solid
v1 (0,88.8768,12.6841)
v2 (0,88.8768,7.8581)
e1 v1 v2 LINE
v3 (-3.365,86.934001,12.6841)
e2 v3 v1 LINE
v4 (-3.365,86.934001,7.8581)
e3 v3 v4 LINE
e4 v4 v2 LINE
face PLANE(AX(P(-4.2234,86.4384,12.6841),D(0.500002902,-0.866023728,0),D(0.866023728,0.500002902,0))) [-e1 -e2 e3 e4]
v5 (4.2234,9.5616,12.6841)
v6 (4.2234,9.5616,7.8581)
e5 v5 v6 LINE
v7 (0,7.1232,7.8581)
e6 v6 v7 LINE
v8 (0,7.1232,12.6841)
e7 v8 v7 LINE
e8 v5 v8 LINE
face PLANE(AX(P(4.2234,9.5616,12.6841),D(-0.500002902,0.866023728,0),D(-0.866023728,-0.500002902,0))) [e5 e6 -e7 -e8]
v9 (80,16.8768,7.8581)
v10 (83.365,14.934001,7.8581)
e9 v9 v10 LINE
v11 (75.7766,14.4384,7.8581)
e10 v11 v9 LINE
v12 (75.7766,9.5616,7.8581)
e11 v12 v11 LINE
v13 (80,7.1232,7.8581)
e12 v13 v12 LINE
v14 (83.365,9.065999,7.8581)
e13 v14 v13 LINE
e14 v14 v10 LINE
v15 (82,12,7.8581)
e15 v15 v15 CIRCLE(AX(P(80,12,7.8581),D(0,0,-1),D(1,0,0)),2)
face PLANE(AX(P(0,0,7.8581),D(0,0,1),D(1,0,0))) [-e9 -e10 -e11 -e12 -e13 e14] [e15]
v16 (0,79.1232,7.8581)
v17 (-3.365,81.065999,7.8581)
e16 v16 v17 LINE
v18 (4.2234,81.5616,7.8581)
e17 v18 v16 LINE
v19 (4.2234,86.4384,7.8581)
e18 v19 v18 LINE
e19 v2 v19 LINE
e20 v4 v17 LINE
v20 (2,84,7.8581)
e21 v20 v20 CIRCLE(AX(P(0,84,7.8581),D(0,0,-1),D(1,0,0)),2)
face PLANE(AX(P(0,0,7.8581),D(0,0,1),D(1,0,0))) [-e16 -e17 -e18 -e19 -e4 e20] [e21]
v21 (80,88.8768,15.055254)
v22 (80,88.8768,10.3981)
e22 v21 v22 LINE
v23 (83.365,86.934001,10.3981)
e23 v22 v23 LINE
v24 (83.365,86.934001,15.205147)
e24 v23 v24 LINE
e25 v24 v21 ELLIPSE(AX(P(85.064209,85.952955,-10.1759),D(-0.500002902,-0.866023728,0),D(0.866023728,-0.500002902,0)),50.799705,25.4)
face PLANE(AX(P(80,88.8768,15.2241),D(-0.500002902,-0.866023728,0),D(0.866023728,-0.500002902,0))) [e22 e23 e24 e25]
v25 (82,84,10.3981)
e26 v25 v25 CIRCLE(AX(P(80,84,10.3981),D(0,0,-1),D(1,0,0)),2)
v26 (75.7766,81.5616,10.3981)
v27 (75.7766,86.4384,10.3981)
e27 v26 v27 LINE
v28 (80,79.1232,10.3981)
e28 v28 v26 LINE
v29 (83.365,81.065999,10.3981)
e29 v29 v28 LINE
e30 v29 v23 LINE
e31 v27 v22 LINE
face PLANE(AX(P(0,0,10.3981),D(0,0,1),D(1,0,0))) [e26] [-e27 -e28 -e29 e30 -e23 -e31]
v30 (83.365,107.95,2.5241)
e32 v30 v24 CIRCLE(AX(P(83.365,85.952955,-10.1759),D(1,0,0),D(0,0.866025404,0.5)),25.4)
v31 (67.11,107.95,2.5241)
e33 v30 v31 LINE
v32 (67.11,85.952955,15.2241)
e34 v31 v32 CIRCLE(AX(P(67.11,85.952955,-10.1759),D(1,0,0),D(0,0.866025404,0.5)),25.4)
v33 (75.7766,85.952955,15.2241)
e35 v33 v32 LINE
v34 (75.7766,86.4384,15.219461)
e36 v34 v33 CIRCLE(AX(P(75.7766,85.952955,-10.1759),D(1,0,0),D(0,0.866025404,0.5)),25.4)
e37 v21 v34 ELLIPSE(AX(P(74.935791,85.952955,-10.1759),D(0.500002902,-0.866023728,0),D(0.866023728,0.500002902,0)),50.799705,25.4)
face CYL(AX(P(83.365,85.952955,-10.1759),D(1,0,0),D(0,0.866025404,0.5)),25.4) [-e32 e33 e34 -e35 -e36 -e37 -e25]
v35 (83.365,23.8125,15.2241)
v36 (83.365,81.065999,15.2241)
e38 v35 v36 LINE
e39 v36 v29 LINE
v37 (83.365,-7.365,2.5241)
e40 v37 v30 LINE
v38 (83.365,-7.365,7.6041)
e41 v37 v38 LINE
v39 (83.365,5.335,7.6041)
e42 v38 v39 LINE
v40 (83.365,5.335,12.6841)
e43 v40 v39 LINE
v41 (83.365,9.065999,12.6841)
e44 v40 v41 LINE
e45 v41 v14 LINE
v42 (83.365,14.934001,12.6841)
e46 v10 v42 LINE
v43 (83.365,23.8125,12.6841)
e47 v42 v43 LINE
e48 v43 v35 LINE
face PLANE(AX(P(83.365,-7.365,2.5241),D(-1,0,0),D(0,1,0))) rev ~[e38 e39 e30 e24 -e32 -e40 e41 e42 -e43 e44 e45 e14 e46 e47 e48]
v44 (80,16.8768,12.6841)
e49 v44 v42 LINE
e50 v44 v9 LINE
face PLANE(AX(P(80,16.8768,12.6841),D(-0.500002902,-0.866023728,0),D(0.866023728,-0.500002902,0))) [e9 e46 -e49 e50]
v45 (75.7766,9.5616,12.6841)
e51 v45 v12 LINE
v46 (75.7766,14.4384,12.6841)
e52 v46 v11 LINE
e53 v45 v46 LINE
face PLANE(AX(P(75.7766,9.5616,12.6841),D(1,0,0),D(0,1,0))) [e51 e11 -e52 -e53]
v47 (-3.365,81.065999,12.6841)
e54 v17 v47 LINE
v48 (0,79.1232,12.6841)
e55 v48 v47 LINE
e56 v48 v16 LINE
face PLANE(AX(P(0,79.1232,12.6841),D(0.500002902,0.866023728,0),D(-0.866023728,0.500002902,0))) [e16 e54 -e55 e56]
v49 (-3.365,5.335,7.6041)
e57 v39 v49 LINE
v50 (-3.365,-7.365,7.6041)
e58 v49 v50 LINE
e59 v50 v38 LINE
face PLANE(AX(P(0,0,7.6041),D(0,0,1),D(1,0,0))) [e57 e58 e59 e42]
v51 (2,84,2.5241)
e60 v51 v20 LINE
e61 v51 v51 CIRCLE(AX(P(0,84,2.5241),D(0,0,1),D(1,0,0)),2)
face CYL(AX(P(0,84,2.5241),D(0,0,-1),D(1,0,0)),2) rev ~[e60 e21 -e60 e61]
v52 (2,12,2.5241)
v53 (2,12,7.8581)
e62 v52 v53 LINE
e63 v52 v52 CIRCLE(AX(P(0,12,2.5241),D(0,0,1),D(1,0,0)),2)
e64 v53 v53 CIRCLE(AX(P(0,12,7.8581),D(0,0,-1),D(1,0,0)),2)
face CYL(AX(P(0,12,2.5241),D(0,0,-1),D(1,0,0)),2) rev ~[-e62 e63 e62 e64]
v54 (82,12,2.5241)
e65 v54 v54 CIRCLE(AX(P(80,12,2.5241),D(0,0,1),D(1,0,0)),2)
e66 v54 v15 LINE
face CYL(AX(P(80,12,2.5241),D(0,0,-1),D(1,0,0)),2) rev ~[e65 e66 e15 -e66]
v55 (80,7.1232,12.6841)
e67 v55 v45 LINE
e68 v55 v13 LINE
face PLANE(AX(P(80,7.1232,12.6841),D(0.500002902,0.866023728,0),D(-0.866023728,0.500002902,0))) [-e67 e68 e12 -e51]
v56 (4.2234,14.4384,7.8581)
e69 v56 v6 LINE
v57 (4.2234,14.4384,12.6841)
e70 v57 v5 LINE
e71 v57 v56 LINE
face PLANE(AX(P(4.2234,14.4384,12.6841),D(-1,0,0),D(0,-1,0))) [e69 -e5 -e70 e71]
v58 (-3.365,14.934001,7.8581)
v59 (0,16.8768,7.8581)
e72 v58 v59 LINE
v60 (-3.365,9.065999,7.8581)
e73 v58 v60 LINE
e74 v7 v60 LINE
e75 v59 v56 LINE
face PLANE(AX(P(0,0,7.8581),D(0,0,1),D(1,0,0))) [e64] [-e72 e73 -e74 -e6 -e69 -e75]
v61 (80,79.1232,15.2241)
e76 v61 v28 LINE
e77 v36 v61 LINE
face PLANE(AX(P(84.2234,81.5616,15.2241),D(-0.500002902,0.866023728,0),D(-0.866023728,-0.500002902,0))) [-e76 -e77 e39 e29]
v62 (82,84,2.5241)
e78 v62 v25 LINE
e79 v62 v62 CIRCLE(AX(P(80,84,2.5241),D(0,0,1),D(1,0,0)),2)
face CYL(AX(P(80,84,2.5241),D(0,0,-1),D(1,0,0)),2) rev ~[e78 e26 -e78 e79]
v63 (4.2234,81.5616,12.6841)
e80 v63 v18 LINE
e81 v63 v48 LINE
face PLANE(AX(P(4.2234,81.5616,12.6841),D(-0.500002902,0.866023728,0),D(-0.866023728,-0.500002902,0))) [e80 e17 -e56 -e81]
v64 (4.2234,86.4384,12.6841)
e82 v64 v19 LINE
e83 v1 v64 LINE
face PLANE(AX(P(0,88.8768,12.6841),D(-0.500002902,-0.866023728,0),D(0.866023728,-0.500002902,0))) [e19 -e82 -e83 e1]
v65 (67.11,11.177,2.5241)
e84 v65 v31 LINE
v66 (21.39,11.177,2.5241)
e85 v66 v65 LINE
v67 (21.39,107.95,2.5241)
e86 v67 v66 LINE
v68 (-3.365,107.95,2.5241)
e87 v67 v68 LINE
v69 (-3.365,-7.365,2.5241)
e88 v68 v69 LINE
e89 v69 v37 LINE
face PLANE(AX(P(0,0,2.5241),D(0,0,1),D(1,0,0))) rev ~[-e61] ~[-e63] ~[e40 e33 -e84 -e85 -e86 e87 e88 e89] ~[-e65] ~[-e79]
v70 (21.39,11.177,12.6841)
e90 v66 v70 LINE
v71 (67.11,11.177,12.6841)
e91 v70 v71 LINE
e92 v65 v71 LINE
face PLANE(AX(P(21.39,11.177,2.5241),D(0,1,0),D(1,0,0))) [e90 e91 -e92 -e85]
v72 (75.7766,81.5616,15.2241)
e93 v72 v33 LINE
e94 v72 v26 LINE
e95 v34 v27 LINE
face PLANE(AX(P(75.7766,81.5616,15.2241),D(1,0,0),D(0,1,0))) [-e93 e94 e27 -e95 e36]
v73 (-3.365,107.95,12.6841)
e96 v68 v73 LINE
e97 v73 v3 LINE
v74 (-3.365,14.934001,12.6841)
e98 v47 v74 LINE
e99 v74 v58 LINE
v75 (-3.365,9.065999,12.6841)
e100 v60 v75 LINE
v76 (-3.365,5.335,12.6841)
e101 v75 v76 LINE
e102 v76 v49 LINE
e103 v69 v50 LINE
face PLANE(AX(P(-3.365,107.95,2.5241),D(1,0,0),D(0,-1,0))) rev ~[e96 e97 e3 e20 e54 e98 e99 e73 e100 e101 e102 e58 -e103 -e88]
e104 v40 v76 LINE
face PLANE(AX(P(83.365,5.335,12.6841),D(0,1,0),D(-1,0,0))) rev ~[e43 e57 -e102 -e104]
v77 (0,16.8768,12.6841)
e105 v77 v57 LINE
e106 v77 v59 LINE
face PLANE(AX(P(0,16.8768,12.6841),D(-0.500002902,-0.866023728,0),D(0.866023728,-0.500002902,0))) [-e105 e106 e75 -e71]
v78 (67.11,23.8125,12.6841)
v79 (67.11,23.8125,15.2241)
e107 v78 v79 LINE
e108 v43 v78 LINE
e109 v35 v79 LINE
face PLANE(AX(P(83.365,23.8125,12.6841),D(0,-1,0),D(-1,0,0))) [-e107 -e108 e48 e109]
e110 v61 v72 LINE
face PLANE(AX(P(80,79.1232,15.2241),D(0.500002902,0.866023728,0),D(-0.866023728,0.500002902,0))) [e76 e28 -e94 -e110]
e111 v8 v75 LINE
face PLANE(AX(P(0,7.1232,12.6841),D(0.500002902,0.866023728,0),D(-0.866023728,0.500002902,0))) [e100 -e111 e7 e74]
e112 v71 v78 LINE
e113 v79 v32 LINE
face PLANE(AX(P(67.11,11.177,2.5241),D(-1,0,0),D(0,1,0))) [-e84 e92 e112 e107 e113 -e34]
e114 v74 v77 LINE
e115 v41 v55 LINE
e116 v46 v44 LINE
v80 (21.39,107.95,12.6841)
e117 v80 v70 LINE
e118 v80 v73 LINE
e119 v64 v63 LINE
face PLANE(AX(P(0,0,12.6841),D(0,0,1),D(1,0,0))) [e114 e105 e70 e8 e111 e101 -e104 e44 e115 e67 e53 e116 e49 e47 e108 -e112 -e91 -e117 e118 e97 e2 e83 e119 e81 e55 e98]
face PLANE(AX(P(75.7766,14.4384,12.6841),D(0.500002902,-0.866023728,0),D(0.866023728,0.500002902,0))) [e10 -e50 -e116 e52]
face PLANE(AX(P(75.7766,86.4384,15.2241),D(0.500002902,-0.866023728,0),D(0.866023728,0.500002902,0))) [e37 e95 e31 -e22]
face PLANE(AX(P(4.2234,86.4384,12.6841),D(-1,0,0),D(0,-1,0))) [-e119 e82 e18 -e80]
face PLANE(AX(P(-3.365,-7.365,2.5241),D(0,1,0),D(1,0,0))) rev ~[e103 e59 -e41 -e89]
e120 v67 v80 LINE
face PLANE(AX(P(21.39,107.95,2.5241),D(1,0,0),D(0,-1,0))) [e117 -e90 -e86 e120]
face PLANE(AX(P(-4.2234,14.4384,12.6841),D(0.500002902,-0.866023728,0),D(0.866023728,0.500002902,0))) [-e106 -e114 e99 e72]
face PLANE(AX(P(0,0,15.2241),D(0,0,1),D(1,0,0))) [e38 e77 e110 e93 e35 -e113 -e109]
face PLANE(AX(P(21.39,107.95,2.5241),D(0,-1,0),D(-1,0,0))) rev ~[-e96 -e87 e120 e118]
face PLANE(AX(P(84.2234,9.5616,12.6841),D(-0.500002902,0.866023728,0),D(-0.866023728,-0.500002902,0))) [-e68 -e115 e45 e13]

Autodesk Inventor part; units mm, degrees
ref_plane "YZ Plane" through (0, 0, 0) normal (1, 0, 0) x (0, 1, 0)
ref_plane "XZ Plane" through (0, 0, 0) normal (0, 1, 0) x (-1, 0, 0)
ref_plane "Work Plane1" through (0, 0, 2.5241) normal (0, 0, 1) x (1, 0, 0)
sketch "Sketch1" plane through (0, 0, 2.5241) normal (0, 0, 1) x (1, 0, 0)
  line L0 (-4, 272) -> (-4, -8) construction
  line L1 (4, 272) -> (4, -8) construction
  line L2 (76, 272) -> (76, -8) construction
  line L3 (84, 272) -> (84, -8) construction
  line L4 (84, -8) -> (-4, -8) construction
  line L5 (84, 106) -> (80, 106) construction
  line L6 (80, 110) -> (76, 110) construction
  line L7 (-3.365, 272) -> (-3.365, -7.365) construction
  line L8 (-3.365, -7.365) -> (83.365, -7.365) construction
  line L9 (83.365, -7.365) -> (83.365, 272) construction
  line L10 (-3.365, -7.365) -> (83.365, -7.365)
  line L11 (83.365, -7.365) -> (83.365, 107.95)
  line L12 (-3.365, 107.95) -> (-3.365, -7.365)
  circle A0 centre (0, 12) radius 2
  circle A1 centre (80, 12) radius 2
  circle A2 centre (0, 84) radius 2
  circle A3 centre (80, 84) radius 2
  line L13 (21.39, 107.95) -> (21.39, 11.177)
  line L14 (21.39, 11.177) -> (67.11, 11.177)
  line L15 (67.11, 11.177) -> (67.11, 107.95)
  line L16 (83.365, 107.95) -> (67.11, 107.95)
  line L17 (21.39, 107.95) -> (-3.365, 107.95)
  point P0 (0, 0)
  dimension "d0" = 0.635
  dimension "d1" = 8.89
  dimension "d2" = 45.72
  dimension "d18" = 18.542
extrude "Extrusion1" add sketch "Sketch1" along normal blind 10.16
sketch "Sketch2" plane through (0, 0, 12.6841) normal (0, 0, 1) x (1, 0, 0)
  line L0 (83.365, 107.95) -> (67.11, 107.95) projected
  line L1 (83.365, -7.365) -> (83.365, 107.95) projected
  line L2 (67.11, 107.95) -> (83.365, 107.95)
  line L3 (83.365, 107.95) -> (83.365, 23.8125)
  line L4 (83.365, 23.8125) -> (67.11, 23.8125)
  line L5 (67.11, 23.8125) -> (67.11, 107.95)
  circle A0 centre (80, 84) radius 2 projected
  circle A1 centre (80, 84) radius 1.9939
  point P0 (0, 0)
  dimension "d5" = 3.9878
extrude "Extrusion2" add sketch "Sketch2" along normal blind 2.54 contours L1 L4 L5 L0
fillet "Fillet1" radius 25.4 1 edges at (75.2375, 107.95, 15.2241)
sketch "Sketch3" plane through (0, 0, 12.6841) normal (0, 0, 1) x (1, 0, 0)
  circle A0 centre (0, 12) radius 2 construction
  circle A1 centre (0, 12) radius 4.8768 construction
  circle A2 centre (0, 84) radius 2 construction
  circle A3 centre (0, 84) radius 4.8768 construction
  circle A4 centre (80, 12) radius 2 construction
  circle A5 centre (80, 12) radius 4.8768 construction
  line L0 (80, 16.8768) -> (84.2234, 14.4384)
  line L1 (84.2234, 14.4384) -> (84.2234, 9.5616)
  line L2 (84.2234, 9.5616) -> (80, 7.1232)
  line L3 (80, 7.1232) -> (75.7766, 9.5616)
  line L4 (75.7766, 9.5616) -> (75.7766, 14.4384)
  line L5 (75.7766, 14.4384) -> (80, 16.8768)
  line L6 (0, 16.8768) -> (4.2234, 14.4384)
  line L7 (4.2234, 14.4384) -> (4.2234, 9.5616)
  line L8 (4.2234, 9.5616) -> (0, 7.1232)
  line L9 (0, 7.1232) -> (-4.2234, 9.5616)
  line L10 (-4.2234, 9.5616) -> (-4.2234, 14.4384)
  line L11 (-4.2234, 14.4384) -> (0, 16.8768)
  line L12 (0, 88.8768) -> (4.2234, 86.4384)
  line L13 (4.2234, 86.4384) -> (4.2234, 81.5616)
  line L14 (4.2234, 81.5616) -> (0, 79.1232)
  line L15 (0, 79.1232) -> (-4.2234, 81.5616)
  line L16 (-4.2234, 81.5616) -> (-4.2234, 86.4384)
  line L17 (-4.2234, 86.4384) -> (0, 88.8768)
  point P0 (0, 0)
  dimension "d9" = 9.7536
  dimension "d10" = 9.7536
  dimension "d11" = 9.7536
extrude "Extrusion3" cut sketch "Sketch3" against normal blind 4.826
sketch "Sketch4" plane through (0, 0, 15.2241) normal (0, 0, 1) x (1, 0, 0)
  circle A0 centre (80, 84) radius 2 construction
  circle A1 centre (80, 84) radius 4.8768 construction
  line L0 (80, 88.8768) -> (84.2234, 86.4384)
  line L1 (84.2234, 86.4384) -> (84.2234, 81.5616)
  line L2 (84.2234, 81.5616) -> (80, 79.1232)
  line L3 (80, 79.1232) -> (75.7766, 81.5616)
  line L4 (75.7766, 81.5616) -> (75.7766, 86.4384)
  line L5 (75.7766, 86.4384) -> (80, 88.8768)
  point P0 (0, 0)
  dimension "d14" = 9.7536
extrude "Extrusion4" cut sketch "Sketch4" against normal blind 4.826
sketch "Sketch5" plane through (0, 0, 12.6841) normal (0, 0, 1) x (1, 0, 0)
  line L0 (-3.365, -7.365) -> (83.365, -7.365) projected
  line L1 (83.365, -7.365) -> (83.365, 107.95) projected
  line L2 (-3.365, -7.365) -> (83.365, -7.365)
  line L3 (83.365, -7.365) -> (83.365, 5.335)
  line L4 (83.365, 5.335) -> (-3.365, 5.335)
  line L5 (-3.365, 5.335) -> (-3.365, -7.365)
  point P0 (0, 0)
  dimension "d19" = 12.7
extrude "Extrusion5" cut sketch "Sketch5" against normal blind 5.08
properties part number "Old Back Wall"
